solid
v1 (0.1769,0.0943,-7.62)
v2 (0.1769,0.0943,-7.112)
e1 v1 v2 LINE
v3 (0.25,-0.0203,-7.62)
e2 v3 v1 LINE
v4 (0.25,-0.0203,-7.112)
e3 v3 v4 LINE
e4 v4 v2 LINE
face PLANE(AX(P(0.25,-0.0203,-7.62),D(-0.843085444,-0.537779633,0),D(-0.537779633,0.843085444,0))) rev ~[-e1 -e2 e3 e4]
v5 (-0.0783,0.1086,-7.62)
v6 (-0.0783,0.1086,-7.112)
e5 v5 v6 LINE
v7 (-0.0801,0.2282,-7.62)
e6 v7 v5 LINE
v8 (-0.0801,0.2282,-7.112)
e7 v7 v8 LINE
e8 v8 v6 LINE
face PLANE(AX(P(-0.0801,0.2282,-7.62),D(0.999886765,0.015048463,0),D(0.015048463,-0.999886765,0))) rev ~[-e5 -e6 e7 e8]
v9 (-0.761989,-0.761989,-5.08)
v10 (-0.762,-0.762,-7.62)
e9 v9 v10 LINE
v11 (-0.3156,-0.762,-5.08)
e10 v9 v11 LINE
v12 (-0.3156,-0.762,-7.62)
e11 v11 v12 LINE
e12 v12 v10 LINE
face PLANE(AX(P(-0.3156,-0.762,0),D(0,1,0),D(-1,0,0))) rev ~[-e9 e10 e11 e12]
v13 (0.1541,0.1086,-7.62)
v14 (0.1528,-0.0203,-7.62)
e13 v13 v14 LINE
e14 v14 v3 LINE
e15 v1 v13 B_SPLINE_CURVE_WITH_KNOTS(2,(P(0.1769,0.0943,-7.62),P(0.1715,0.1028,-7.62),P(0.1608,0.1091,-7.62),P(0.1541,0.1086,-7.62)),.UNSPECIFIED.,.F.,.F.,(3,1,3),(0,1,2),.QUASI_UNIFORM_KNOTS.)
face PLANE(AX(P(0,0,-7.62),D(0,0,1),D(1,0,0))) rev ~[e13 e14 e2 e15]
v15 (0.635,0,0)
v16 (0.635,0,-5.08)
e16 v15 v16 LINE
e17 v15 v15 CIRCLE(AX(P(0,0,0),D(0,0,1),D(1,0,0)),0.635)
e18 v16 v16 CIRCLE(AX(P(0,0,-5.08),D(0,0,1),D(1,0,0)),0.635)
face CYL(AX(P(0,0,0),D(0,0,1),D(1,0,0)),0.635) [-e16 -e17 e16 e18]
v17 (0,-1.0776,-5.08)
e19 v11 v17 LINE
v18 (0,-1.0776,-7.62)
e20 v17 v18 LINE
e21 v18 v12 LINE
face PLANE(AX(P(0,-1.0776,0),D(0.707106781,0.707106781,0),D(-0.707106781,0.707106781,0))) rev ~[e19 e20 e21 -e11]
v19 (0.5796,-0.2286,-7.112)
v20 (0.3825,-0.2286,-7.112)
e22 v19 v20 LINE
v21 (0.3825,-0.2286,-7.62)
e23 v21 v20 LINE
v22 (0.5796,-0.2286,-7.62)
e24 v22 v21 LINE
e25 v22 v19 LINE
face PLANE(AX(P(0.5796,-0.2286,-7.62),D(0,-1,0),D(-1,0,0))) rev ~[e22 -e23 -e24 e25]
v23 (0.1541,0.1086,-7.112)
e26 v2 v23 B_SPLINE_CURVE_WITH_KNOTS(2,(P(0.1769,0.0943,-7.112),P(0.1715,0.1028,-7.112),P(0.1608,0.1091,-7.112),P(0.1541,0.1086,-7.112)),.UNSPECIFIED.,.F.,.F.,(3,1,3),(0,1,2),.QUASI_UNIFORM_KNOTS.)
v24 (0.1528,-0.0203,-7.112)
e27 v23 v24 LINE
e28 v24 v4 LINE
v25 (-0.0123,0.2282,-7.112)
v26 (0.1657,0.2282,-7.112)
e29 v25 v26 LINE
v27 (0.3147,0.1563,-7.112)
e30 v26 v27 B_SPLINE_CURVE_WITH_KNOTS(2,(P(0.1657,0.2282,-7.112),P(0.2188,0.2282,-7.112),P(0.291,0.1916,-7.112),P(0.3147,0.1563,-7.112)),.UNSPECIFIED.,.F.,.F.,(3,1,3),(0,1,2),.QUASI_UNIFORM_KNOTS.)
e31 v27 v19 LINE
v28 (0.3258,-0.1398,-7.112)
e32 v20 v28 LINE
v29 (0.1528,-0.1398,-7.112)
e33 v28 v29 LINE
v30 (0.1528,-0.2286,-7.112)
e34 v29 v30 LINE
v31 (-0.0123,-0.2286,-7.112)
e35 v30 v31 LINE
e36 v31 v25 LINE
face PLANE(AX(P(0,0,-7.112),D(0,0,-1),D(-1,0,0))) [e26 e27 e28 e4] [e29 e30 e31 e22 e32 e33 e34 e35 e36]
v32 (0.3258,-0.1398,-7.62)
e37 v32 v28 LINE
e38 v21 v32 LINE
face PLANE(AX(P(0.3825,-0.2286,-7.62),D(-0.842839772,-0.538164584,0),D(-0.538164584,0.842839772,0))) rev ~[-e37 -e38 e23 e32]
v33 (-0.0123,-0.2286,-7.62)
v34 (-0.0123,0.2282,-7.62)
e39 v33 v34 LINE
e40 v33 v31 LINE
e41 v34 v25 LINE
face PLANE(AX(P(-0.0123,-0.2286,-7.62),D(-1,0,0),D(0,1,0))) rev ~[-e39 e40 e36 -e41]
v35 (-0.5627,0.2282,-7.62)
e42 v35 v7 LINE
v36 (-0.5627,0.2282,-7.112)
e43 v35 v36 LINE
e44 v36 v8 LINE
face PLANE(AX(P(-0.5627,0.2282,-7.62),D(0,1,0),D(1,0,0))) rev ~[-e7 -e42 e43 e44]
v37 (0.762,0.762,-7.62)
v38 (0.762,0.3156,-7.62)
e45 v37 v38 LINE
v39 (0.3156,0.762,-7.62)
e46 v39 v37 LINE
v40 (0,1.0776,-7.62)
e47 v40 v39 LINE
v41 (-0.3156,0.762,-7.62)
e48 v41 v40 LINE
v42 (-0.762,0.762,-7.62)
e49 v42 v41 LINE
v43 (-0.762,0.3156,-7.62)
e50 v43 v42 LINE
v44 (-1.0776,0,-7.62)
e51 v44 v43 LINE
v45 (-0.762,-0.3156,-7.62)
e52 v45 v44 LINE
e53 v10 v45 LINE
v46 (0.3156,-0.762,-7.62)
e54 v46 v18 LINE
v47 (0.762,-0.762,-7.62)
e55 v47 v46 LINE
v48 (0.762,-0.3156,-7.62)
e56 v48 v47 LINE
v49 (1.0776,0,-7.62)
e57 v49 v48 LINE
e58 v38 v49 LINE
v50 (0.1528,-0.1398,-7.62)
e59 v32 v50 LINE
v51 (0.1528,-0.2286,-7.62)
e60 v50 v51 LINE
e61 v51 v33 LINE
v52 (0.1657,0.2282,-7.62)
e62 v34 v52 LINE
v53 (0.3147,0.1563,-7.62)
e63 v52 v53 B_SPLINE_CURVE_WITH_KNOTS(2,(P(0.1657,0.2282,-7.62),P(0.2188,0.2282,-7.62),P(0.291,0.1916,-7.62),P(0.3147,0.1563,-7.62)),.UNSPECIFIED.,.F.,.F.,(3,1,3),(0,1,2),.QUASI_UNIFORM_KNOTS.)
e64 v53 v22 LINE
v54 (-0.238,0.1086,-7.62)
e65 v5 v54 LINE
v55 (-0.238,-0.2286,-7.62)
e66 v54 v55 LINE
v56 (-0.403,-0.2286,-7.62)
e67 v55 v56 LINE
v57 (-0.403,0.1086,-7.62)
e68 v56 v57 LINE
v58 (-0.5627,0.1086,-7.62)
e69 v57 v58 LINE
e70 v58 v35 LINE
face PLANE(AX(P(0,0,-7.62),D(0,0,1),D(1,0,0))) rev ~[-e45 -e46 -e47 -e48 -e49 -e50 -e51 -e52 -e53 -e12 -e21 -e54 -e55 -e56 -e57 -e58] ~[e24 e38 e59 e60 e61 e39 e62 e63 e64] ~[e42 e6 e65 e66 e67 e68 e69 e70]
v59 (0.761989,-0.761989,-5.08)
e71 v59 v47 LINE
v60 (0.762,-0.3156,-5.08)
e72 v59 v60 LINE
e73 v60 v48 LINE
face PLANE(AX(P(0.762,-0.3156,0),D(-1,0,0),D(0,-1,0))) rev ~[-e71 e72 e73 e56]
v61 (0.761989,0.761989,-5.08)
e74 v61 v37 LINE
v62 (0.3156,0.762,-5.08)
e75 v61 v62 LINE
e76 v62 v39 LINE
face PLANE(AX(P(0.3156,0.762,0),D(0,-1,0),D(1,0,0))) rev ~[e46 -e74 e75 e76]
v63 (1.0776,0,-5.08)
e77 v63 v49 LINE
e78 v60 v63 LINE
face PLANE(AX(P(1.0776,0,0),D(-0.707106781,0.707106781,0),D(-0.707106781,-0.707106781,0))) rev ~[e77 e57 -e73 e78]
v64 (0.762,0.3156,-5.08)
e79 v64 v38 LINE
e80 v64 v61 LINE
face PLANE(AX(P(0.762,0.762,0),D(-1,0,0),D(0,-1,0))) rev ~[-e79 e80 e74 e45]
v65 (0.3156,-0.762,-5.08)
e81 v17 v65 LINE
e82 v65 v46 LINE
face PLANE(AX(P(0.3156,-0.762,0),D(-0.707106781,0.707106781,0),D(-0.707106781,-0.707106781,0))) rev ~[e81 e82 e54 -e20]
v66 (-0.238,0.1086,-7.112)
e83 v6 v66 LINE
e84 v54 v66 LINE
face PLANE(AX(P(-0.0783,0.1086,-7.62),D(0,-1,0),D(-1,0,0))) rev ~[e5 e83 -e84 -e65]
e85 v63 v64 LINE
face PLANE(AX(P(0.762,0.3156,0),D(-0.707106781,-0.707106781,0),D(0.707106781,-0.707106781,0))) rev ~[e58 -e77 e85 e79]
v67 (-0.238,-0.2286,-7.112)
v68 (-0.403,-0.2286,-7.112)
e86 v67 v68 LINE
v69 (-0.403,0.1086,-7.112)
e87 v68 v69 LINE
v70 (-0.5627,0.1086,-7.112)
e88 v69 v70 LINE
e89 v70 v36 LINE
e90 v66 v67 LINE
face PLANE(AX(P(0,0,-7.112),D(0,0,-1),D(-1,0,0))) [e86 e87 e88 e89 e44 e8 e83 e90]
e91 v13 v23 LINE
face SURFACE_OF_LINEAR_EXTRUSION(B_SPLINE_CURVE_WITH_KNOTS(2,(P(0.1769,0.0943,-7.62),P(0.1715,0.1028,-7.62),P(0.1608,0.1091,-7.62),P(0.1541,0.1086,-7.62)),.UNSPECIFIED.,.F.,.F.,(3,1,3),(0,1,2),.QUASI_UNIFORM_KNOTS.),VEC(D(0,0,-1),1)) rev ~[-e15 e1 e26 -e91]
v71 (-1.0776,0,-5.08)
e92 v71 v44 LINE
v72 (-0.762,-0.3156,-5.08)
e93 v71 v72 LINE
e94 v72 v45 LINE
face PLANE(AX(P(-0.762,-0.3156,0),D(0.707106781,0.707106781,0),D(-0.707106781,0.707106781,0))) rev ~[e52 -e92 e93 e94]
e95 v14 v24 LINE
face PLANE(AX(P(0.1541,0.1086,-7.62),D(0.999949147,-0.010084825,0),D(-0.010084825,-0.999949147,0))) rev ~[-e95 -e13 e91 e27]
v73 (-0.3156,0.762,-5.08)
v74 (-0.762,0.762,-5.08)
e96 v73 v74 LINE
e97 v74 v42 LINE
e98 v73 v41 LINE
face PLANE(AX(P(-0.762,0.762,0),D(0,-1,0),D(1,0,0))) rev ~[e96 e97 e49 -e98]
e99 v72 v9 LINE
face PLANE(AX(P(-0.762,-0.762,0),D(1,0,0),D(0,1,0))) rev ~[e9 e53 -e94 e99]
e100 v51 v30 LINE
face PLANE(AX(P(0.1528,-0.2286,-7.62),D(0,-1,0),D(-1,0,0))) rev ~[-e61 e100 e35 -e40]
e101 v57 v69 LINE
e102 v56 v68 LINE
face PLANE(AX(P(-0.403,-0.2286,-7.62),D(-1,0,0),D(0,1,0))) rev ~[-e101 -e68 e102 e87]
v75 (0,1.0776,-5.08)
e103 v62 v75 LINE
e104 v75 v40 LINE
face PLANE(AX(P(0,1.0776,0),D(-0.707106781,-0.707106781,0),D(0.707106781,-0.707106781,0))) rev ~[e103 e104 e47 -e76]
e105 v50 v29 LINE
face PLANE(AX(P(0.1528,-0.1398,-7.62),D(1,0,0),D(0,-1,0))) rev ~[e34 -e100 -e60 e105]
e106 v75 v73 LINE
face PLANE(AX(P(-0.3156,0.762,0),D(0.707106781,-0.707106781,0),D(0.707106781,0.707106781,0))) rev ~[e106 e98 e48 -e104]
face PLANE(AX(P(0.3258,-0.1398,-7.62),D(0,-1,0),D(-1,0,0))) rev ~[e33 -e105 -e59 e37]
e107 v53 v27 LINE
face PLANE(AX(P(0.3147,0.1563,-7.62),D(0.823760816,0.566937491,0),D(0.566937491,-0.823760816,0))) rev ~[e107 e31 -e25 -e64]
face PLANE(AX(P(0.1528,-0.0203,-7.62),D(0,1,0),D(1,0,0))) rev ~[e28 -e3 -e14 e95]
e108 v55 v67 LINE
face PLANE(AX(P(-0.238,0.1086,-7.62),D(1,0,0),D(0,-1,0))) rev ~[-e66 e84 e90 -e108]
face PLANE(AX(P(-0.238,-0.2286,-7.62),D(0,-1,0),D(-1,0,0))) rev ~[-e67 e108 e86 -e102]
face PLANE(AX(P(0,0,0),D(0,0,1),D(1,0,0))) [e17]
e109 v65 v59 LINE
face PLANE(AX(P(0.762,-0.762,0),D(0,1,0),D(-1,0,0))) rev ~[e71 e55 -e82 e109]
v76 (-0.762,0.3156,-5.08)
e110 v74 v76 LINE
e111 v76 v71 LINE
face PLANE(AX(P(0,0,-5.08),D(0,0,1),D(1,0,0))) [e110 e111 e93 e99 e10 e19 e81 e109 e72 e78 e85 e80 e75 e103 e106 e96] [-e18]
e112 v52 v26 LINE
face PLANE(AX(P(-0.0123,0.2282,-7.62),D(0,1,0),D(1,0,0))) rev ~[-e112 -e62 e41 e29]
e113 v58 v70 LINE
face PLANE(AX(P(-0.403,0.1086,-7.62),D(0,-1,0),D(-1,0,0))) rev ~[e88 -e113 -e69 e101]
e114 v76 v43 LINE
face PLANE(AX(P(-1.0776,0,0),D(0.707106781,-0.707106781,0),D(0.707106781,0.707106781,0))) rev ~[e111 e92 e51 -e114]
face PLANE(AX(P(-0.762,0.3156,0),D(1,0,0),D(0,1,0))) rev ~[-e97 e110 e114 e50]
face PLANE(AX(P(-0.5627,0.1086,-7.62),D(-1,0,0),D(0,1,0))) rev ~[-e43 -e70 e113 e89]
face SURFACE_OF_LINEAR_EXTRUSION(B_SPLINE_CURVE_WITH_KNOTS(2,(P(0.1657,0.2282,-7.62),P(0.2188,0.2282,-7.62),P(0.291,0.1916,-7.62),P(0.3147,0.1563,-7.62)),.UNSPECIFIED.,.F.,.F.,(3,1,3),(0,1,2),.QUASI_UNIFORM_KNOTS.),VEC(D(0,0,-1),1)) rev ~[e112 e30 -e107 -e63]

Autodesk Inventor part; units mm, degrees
ref_plane "YZ Plane" through (0, 0, 0) normal (1, 0, 0) x (0, 1, 0)
ref_plane "XZ Plane" through (0, 0, 0) normal (0, 1, 0) x (-1, 0, 0)
ref_plane "XY Plane" through (0, 0, 0) normal (0, 0, 1) x (1, 0, 0)
sketch "Sketch1" plane through (0, 0, 0) normal (0, 0, 1) x (1, 0, 0)
  circle A0 centre (0, 0) radius 0.762
  line L0 (-1.0776, 0) -> (0, 1.0776)
  line L1 (0, 1.0776) -> (1.0776, 0)
  line L2 (1.0776, 0) -> (0, -1.0776)
  line L3 (0, -1.0776) -> (-1.0776, 0)
  line L4 (-0.762, 0.762) -> (0.762, 0.762)
  line L5 (0.762, 0.762) -> (0.762, -0.762)
  line L6 (0.762, -0.762) -> (-0.762, -0.762)
  line L7 (-0.762, -0.762) -> (-0.762, 0.762)
  point P0 (0, 3.175)
  point P1 (-3.175, 0)
  point P2 (-0.898, 0.898)
  point P3 (-0.6286, -0.0898)
  point P4 (-0.5388, -0.5388)
  point P5 (0.5388, -0.5388)
  point P6 (0.3287, 1.2267)
  point P7 (3.7343, 0.7559)
  point P8 (0.5388, 0.5388)
  point P9 (-0.5388, 0.5388)
  point P10 (0, 0.762)
  point P11 (-0.762, 0)
  point P12 (0.3156, 0.762)
  point P13 (-0.3156, 0.762)
  point P14 (-0.762, 0.3156)
  point P15 (-0.762, -0.3156)
  point P16 (-0.3156, -0.762)
  point P17 (0.3156, -0.762)
  point P18 (0.762, -0.3156)
  point P19 (0.762, 0.3156)
  dimension "d0" = 1.524
  dimension "d1" = 1.524
  dimension "d2" = 1.524
  dimension "d3" = 0
  dimension "d12" = 0
  dimension "d13" = 0
  dimension "d16" = 1.524
  dimension "d17" = 1.524
  dimension "d18" = 0
  dimension "d19" = 0
extrude "Extrusion3" add sketch "Sketch1" against normal blind 7.62
sketch "Sketch6" plane through (0, 0, 0) normal (0, 0, 1) x (1, 0, 0)
  line L0 (-0.762, 0.3156) -> (-0.762, 0.762) projected
  circle A0 centre (0, 0) radius 1.0776
  line L1 (-0.762, 0.762) -> (-0.3156, 0.762) projected
  circle A1 centre (0, 0) radius 0.635
  dimension "d33" = 1.27
extrude "Extrusion6" cut sketch "Sketch6" against normal blind 5.08
sketch "Sketch7" plane through (0, 0, -7.62) normal (0, 0, -1) x (-1, 0, 0)
  line L0 (-1.6188, 0.635) -> (1.6188, 0.635) construction
  line L1 (1.6188, 0.635) -> (1.6188, -0.635) construction
  line L2 (1.6188, -0.635) -> (-1.6188, -0.635) construction
  line L3 (-1.6188, -0.635) -> (-1.6188, 0.635) construction
  line L4 (-0.1528, -0.1398) -> (-0.1528, -0.2286)
  line L5 (-0.1528, -0.2286) -> (0.0123, -0.2286)
  line L6 (0.0123, -0.2286) -> (0.0123, 0.2282)
  line L7 (0.0123, 0.2282) -> (-0.1657, 0.2282)
  spline S0 degree 2 poles (-0.1657, 0.2282) (-0.2188, 0.2282) (-0.291, 0.1916) (-0.3147, 0.1563) knots 0 0 0 1 2 2 2
  line L8 (-0.3147, 0.1563) -> (-0.5796, -0.2286)
  line L9 (-0.5796, -0.2286) -> (-0.3825, -0.2286)
  line L10 (-0.3825, -0.2286) -> (-0.3258, -0.1398)
  line L11 (-0.3258, -0.1398) -> (-0.1528, -0.1398)
  line L12 (-0.25, -0.0203) -> (-0.1769, 0.0943)
  spline S1 degree 2 poles (-0.1769, 0.0943) (-0.1715, 0.1028) (-0.1608, 0.1091) (-0.1541, 0.1086) knots 0 0 0 1 2 2 2
  line L13 (-0.1541, 0.1086) -> (-0.1528, 0.1086)
  line L14 (-0.1528, 0.1086) -> (-0.1528, -0.0203)
  line L15 (-0.1528, -0.0203) -> (-0.25, -0.0203)
  line L16 (0.0783, 0.1086) -> (0.238, 0.1086)
  line L17 (0.238, 0.1086) -> (0.238, -0.2286)
  line L18 (0.238, -0.2286) -> (0.403, -0.2286)
  line L19 (0.403, -0.2286) -> (0.403, 0.1086)
  line L20 (0.403, 0.1086) -> (0.5627, 0.1086)
  line L21 (0.5627, 0.1086) -> (0.5627, 0.2282)
  line L22 (0.5627, 0.2282) -> (0.0801, 0.2282)
  line L23 (0.0801, 0.2282) -> (0.0783, 0.1086)
  point P0 (0, 0)
  point P1 (0, 0.635)
  point P2 (-1.6188, 0)
  dimension "d34" = 0
  dimension "d35" = 0
extrude "Extrusion7" cut sketch "Sketch7" against normal blind 0.508
properties part number "screwhead"
